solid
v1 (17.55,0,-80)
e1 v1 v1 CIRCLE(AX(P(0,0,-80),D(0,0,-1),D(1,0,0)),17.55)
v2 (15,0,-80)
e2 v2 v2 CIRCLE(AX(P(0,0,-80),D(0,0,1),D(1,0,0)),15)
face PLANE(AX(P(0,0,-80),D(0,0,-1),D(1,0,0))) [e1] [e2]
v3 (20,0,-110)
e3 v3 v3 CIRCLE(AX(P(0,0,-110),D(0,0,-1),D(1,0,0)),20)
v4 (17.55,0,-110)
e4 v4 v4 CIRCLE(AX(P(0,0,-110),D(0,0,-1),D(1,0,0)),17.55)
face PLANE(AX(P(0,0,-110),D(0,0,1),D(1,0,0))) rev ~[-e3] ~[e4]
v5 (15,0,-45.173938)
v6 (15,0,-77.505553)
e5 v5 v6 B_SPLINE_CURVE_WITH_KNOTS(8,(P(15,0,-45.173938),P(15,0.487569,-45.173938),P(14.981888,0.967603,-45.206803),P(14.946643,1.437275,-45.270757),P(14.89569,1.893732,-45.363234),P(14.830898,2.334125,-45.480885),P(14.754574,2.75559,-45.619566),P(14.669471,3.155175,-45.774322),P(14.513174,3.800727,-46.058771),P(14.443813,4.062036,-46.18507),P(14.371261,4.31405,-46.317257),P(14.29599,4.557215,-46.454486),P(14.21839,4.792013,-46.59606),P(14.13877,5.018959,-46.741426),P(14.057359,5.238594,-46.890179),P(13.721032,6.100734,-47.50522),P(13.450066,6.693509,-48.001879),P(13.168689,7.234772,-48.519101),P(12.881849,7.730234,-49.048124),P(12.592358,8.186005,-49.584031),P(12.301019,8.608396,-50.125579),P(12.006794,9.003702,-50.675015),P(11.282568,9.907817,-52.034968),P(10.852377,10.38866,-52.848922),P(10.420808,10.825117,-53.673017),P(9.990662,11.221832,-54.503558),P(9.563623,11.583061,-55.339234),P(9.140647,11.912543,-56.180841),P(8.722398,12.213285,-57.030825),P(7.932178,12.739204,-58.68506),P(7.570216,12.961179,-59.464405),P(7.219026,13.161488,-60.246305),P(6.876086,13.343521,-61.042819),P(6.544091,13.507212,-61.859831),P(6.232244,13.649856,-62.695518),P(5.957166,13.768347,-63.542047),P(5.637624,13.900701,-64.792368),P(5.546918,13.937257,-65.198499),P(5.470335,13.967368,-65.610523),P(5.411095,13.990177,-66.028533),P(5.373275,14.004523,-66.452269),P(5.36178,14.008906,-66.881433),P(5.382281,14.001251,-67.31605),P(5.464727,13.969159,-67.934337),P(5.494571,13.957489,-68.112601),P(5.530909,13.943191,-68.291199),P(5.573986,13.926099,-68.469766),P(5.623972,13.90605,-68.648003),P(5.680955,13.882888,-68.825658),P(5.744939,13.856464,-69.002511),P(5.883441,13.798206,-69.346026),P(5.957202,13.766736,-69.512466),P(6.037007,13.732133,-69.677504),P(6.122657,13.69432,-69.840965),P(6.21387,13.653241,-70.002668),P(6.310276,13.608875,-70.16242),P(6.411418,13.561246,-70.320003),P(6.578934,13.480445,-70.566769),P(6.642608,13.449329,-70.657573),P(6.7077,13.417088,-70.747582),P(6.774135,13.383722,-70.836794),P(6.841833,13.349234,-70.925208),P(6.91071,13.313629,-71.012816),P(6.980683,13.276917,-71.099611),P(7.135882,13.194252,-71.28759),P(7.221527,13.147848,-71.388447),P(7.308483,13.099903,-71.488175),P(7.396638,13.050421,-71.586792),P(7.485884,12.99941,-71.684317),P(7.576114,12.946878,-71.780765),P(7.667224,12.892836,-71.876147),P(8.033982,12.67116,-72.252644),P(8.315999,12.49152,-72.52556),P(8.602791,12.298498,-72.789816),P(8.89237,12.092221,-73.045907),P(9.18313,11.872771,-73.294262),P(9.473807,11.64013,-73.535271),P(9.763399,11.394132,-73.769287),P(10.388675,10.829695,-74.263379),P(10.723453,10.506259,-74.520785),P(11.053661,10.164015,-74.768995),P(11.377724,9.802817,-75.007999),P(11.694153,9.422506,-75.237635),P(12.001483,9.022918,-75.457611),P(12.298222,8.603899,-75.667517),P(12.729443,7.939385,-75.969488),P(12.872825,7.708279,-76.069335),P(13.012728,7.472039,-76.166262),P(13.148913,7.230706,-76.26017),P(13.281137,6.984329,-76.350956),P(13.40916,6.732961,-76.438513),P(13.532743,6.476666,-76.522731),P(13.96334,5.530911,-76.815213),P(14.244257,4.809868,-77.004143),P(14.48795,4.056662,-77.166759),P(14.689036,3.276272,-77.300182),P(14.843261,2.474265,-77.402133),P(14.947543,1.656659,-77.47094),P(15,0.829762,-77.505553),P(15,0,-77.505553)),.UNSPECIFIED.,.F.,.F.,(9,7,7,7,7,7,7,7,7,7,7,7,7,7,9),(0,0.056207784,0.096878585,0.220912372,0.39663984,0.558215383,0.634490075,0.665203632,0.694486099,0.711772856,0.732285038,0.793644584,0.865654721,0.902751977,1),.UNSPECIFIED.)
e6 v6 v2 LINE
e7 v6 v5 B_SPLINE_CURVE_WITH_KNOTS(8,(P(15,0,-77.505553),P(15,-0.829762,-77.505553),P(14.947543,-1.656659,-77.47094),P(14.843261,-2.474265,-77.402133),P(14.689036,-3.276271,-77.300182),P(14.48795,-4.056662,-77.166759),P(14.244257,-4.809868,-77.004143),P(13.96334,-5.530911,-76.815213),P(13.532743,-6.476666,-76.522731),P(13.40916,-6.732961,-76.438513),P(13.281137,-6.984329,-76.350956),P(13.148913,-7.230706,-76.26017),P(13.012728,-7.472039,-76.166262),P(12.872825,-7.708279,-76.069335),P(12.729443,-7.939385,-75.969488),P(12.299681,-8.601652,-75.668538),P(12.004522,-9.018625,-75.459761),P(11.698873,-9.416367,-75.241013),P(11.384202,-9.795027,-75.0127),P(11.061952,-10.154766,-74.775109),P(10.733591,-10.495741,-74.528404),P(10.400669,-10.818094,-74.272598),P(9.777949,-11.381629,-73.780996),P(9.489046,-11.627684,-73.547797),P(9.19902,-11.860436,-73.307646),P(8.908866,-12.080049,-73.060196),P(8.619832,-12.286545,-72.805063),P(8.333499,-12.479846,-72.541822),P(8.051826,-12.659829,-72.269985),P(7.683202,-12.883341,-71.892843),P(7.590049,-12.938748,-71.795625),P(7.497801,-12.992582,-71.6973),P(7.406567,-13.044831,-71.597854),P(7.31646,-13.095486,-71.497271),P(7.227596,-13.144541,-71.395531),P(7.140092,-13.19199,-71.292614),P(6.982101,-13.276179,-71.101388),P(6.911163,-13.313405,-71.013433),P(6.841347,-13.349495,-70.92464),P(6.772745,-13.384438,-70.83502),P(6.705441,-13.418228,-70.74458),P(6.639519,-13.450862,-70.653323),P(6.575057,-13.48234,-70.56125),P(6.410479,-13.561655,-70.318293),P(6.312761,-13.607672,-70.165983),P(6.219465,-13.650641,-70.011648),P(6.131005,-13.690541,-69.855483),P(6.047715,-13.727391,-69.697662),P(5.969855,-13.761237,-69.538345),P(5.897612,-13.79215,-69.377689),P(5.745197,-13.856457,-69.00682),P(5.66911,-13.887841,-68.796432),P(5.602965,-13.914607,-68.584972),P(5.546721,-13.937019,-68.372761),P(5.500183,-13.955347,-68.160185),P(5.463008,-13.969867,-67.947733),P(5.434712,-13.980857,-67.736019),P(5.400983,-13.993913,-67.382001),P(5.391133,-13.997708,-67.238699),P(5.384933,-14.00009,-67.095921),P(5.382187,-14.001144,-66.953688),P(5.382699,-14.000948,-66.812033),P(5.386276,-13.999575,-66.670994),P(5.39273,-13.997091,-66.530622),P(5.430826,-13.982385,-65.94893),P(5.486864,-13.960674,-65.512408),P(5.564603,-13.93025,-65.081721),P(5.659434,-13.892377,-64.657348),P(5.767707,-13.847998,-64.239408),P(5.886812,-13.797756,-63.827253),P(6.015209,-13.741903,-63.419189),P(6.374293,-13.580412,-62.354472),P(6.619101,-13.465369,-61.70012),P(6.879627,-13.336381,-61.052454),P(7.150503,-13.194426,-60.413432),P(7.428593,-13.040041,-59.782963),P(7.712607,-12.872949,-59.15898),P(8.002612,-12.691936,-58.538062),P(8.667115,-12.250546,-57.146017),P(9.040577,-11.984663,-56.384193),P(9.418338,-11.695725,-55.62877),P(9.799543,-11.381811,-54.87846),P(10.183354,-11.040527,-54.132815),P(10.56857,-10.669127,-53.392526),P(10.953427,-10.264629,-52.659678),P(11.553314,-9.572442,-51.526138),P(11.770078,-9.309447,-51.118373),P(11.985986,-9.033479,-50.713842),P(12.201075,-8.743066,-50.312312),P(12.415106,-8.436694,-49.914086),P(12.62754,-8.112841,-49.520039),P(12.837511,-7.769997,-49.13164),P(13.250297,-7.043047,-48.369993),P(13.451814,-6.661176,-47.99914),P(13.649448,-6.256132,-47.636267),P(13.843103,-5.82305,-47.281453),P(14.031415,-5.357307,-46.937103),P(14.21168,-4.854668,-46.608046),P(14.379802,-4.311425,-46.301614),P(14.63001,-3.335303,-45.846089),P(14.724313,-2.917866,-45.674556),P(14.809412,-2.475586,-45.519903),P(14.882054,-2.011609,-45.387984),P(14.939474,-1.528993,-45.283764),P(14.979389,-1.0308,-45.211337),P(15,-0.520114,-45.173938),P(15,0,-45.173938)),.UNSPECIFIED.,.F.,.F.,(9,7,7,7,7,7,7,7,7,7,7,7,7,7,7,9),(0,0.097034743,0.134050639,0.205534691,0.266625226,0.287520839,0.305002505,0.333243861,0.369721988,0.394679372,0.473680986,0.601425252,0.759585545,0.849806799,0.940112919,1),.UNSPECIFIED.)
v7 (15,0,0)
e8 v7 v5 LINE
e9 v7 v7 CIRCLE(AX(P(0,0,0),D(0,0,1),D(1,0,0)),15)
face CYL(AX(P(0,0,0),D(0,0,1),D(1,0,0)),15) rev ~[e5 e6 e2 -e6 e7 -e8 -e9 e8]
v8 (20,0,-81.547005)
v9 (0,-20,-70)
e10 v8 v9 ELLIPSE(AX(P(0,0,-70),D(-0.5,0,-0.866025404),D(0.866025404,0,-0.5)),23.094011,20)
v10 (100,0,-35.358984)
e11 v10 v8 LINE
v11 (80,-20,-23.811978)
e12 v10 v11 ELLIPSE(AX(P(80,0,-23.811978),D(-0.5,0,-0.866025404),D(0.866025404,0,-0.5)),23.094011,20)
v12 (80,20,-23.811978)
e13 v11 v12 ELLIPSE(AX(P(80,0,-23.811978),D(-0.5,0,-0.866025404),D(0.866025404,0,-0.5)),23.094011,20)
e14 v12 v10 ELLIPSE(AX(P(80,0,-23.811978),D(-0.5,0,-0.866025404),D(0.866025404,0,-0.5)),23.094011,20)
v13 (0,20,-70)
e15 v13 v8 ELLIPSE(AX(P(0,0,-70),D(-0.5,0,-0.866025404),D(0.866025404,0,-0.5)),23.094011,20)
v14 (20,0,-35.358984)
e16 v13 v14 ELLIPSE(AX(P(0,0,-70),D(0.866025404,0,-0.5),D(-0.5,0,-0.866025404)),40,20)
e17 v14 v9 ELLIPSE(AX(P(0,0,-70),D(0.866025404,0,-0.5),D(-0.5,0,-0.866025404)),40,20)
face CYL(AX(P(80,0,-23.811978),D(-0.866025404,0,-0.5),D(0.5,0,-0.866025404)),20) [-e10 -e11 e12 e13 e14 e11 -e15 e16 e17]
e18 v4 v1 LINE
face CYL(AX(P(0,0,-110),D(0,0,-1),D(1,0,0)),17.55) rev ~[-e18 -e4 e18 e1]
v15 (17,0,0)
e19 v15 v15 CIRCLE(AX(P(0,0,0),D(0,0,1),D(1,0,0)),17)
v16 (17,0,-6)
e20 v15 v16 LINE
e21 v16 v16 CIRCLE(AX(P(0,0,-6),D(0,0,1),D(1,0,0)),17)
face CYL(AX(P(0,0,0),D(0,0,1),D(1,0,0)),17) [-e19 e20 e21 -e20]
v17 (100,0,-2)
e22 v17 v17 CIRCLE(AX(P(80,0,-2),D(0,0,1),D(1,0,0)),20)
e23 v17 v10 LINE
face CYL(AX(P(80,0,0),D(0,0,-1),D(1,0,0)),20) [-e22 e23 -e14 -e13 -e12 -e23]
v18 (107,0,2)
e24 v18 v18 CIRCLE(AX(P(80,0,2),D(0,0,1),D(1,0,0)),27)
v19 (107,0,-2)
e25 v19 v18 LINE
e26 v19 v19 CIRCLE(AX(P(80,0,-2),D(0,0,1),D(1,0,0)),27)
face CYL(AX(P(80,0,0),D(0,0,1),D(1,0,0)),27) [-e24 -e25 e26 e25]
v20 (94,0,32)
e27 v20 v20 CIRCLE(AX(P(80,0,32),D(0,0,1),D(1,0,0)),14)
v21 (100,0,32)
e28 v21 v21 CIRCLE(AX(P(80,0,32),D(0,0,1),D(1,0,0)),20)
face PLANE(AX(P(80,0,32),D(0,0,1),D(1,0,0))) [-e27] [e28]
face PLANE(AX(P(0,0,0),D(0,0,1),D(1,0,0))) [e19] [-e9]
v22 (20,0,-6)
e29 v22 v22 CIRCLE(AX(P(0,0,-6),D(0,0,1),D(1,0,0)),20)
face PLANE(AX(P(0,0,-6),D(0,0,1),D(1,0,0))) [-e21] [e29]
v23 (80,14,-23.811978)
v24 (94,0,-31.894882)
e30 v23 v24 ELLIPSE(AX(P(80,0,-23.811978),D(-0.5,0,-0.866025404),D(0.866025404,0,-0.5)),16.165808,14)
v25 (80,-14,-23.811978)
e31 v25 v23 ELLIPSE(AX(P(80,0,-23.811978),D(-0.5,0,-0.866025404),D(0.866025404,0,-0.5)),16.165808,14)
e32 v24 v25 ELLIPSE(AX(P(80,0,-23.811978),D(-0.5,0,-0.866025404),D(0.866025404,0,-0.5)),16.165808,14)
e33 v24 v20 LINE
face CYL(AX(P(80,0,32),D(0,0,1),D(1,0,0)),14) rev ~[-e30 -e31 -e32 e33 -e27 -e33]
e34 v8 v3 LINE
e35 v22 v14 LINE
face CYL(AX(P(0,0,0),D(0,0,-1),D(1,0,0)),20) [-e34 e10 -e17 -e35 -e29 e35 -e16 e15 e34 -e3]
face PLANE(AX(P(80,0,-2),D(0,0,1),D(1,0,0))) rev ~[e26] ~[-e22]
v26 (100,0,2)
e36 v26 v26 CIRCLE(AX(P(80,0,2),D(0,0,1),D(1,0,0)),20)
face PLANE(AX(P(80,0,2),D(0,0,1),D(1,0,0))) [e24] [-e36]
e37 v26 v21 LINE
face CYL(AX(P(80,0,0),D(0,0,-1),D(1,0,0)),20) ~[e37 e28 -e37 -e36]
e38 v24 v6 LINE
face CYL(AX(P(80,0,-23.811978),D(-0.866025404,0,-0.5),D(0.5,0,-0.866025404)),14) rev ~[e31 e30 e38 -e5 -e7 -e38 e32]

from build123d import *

# Parameters (mm, degrees)
F1_R      = 20
F4_R      = 17.55
F5_DEPTH  = 30
F6_R      = 15
F7_DEPTH  = 110.001
F8_R      = 20
F8_R_2    = 17
F9_DEPTH  = 6
F10_R     = 14
F12_R     = 27
F12_R_2   = 20
F13_DEPTH = 2
F14_DEPTH = 32
F15_R     = 14
F16_DEPTH = 34


with BuildPart() as f2:
    # F2: sweep along a path in F0
    with BuildLine(Plane.XZ) as f2_path:
        Line((0, 0), (0, -70))
        Line((0, -70), (0, -110))
    # F1 (on Top) → F2 (sweep)
    with BuildSketch(Plane.XY):
        Circle(F1_R)
    sweep(path=f2_path.line)

    # F3: sweep along a path in F0
    with BuildLine(Plane.XZ) as f3_path:
        Line((80, 0), (80, -23.8119784648))
        Line((80, -23.8119784648), (0, -70))
    # F1 (on Top) → F3 (sweep)
    with BuildSketch(Plane.XY):
        with Locations((80, 0)):
            Circle(F1_R)
    sweep(path=f3_path.line, transition=Transition.RIGHT)

    # F4 (on face) → F5 (cut)
    with BuildSketch(Plane(origin=(0, 0, -110), x_dir=(1, 0, 0), z_dir=(0, 0, -1))):
        Circle(F4_R)
    extrude(amount=-F5_DEPTH, mode=Mode.SUBTRACT)

    # F6 (on face) → F7 (cut, through all)
    with BuildSketch(Plane.XY):
        Circle(F6_R)
    extrude(amount=-F7_DEPTH, mode=Mode.SUBTRACT)

    # F8 (on face) → F9 (cut)
    with BuildSketch(Plane.XY):
        Circle(F8_R)
        Circle(F8_R_2, mode=Mode.SUBTRACT)
    extrude(amount=-F9_DEPTH, mode=Mode.SUBTRACT)

    # F11: sweep along a path in F0
    with BuildLine(Plane.XZ) as f11_path:
        Line((80, 0), (80, -23.8119784648))
        Line((80, -23.8119784648), (0, -70))
    # F10 (on face) → F11 (sweep, cut)
    with BuildSketch(Plane.XY):
        with Locations((80, 0)):
            Circle(F10_R)
    sweep(path=f11_path.line, transition=Transition.RIGHT, mode=Mode.SUBTRACT)

    # F12 (on face) → F13 (join, symmetric)
    with BuildSketch(Plane.XY):
        with Locations((80, 0)):
            Circle(F12_R)
        with Locations((80, 0)):
            Circle(F12_R_2, mode=Mode.SUBTRACT)
    extrude(amount=F13_DEPTH, both=True)

    # F1 (on Top) → F14 (join)
    with BuildSketch(Plane.XY):
        with Locations((80, 0)):
            Circle(F1_R)
    extrude(amount=F14_DEPTH)

    # F15 (on face) → F16 (cut)
    with BuildSketch(Plane.XY.offset(32)):
        with Locations((80, 0)):
            Circle(F15_R)
    extrude(amount=-F16_DEPTH, mode=Mode.SUBTRACT)


solid = f2.part
